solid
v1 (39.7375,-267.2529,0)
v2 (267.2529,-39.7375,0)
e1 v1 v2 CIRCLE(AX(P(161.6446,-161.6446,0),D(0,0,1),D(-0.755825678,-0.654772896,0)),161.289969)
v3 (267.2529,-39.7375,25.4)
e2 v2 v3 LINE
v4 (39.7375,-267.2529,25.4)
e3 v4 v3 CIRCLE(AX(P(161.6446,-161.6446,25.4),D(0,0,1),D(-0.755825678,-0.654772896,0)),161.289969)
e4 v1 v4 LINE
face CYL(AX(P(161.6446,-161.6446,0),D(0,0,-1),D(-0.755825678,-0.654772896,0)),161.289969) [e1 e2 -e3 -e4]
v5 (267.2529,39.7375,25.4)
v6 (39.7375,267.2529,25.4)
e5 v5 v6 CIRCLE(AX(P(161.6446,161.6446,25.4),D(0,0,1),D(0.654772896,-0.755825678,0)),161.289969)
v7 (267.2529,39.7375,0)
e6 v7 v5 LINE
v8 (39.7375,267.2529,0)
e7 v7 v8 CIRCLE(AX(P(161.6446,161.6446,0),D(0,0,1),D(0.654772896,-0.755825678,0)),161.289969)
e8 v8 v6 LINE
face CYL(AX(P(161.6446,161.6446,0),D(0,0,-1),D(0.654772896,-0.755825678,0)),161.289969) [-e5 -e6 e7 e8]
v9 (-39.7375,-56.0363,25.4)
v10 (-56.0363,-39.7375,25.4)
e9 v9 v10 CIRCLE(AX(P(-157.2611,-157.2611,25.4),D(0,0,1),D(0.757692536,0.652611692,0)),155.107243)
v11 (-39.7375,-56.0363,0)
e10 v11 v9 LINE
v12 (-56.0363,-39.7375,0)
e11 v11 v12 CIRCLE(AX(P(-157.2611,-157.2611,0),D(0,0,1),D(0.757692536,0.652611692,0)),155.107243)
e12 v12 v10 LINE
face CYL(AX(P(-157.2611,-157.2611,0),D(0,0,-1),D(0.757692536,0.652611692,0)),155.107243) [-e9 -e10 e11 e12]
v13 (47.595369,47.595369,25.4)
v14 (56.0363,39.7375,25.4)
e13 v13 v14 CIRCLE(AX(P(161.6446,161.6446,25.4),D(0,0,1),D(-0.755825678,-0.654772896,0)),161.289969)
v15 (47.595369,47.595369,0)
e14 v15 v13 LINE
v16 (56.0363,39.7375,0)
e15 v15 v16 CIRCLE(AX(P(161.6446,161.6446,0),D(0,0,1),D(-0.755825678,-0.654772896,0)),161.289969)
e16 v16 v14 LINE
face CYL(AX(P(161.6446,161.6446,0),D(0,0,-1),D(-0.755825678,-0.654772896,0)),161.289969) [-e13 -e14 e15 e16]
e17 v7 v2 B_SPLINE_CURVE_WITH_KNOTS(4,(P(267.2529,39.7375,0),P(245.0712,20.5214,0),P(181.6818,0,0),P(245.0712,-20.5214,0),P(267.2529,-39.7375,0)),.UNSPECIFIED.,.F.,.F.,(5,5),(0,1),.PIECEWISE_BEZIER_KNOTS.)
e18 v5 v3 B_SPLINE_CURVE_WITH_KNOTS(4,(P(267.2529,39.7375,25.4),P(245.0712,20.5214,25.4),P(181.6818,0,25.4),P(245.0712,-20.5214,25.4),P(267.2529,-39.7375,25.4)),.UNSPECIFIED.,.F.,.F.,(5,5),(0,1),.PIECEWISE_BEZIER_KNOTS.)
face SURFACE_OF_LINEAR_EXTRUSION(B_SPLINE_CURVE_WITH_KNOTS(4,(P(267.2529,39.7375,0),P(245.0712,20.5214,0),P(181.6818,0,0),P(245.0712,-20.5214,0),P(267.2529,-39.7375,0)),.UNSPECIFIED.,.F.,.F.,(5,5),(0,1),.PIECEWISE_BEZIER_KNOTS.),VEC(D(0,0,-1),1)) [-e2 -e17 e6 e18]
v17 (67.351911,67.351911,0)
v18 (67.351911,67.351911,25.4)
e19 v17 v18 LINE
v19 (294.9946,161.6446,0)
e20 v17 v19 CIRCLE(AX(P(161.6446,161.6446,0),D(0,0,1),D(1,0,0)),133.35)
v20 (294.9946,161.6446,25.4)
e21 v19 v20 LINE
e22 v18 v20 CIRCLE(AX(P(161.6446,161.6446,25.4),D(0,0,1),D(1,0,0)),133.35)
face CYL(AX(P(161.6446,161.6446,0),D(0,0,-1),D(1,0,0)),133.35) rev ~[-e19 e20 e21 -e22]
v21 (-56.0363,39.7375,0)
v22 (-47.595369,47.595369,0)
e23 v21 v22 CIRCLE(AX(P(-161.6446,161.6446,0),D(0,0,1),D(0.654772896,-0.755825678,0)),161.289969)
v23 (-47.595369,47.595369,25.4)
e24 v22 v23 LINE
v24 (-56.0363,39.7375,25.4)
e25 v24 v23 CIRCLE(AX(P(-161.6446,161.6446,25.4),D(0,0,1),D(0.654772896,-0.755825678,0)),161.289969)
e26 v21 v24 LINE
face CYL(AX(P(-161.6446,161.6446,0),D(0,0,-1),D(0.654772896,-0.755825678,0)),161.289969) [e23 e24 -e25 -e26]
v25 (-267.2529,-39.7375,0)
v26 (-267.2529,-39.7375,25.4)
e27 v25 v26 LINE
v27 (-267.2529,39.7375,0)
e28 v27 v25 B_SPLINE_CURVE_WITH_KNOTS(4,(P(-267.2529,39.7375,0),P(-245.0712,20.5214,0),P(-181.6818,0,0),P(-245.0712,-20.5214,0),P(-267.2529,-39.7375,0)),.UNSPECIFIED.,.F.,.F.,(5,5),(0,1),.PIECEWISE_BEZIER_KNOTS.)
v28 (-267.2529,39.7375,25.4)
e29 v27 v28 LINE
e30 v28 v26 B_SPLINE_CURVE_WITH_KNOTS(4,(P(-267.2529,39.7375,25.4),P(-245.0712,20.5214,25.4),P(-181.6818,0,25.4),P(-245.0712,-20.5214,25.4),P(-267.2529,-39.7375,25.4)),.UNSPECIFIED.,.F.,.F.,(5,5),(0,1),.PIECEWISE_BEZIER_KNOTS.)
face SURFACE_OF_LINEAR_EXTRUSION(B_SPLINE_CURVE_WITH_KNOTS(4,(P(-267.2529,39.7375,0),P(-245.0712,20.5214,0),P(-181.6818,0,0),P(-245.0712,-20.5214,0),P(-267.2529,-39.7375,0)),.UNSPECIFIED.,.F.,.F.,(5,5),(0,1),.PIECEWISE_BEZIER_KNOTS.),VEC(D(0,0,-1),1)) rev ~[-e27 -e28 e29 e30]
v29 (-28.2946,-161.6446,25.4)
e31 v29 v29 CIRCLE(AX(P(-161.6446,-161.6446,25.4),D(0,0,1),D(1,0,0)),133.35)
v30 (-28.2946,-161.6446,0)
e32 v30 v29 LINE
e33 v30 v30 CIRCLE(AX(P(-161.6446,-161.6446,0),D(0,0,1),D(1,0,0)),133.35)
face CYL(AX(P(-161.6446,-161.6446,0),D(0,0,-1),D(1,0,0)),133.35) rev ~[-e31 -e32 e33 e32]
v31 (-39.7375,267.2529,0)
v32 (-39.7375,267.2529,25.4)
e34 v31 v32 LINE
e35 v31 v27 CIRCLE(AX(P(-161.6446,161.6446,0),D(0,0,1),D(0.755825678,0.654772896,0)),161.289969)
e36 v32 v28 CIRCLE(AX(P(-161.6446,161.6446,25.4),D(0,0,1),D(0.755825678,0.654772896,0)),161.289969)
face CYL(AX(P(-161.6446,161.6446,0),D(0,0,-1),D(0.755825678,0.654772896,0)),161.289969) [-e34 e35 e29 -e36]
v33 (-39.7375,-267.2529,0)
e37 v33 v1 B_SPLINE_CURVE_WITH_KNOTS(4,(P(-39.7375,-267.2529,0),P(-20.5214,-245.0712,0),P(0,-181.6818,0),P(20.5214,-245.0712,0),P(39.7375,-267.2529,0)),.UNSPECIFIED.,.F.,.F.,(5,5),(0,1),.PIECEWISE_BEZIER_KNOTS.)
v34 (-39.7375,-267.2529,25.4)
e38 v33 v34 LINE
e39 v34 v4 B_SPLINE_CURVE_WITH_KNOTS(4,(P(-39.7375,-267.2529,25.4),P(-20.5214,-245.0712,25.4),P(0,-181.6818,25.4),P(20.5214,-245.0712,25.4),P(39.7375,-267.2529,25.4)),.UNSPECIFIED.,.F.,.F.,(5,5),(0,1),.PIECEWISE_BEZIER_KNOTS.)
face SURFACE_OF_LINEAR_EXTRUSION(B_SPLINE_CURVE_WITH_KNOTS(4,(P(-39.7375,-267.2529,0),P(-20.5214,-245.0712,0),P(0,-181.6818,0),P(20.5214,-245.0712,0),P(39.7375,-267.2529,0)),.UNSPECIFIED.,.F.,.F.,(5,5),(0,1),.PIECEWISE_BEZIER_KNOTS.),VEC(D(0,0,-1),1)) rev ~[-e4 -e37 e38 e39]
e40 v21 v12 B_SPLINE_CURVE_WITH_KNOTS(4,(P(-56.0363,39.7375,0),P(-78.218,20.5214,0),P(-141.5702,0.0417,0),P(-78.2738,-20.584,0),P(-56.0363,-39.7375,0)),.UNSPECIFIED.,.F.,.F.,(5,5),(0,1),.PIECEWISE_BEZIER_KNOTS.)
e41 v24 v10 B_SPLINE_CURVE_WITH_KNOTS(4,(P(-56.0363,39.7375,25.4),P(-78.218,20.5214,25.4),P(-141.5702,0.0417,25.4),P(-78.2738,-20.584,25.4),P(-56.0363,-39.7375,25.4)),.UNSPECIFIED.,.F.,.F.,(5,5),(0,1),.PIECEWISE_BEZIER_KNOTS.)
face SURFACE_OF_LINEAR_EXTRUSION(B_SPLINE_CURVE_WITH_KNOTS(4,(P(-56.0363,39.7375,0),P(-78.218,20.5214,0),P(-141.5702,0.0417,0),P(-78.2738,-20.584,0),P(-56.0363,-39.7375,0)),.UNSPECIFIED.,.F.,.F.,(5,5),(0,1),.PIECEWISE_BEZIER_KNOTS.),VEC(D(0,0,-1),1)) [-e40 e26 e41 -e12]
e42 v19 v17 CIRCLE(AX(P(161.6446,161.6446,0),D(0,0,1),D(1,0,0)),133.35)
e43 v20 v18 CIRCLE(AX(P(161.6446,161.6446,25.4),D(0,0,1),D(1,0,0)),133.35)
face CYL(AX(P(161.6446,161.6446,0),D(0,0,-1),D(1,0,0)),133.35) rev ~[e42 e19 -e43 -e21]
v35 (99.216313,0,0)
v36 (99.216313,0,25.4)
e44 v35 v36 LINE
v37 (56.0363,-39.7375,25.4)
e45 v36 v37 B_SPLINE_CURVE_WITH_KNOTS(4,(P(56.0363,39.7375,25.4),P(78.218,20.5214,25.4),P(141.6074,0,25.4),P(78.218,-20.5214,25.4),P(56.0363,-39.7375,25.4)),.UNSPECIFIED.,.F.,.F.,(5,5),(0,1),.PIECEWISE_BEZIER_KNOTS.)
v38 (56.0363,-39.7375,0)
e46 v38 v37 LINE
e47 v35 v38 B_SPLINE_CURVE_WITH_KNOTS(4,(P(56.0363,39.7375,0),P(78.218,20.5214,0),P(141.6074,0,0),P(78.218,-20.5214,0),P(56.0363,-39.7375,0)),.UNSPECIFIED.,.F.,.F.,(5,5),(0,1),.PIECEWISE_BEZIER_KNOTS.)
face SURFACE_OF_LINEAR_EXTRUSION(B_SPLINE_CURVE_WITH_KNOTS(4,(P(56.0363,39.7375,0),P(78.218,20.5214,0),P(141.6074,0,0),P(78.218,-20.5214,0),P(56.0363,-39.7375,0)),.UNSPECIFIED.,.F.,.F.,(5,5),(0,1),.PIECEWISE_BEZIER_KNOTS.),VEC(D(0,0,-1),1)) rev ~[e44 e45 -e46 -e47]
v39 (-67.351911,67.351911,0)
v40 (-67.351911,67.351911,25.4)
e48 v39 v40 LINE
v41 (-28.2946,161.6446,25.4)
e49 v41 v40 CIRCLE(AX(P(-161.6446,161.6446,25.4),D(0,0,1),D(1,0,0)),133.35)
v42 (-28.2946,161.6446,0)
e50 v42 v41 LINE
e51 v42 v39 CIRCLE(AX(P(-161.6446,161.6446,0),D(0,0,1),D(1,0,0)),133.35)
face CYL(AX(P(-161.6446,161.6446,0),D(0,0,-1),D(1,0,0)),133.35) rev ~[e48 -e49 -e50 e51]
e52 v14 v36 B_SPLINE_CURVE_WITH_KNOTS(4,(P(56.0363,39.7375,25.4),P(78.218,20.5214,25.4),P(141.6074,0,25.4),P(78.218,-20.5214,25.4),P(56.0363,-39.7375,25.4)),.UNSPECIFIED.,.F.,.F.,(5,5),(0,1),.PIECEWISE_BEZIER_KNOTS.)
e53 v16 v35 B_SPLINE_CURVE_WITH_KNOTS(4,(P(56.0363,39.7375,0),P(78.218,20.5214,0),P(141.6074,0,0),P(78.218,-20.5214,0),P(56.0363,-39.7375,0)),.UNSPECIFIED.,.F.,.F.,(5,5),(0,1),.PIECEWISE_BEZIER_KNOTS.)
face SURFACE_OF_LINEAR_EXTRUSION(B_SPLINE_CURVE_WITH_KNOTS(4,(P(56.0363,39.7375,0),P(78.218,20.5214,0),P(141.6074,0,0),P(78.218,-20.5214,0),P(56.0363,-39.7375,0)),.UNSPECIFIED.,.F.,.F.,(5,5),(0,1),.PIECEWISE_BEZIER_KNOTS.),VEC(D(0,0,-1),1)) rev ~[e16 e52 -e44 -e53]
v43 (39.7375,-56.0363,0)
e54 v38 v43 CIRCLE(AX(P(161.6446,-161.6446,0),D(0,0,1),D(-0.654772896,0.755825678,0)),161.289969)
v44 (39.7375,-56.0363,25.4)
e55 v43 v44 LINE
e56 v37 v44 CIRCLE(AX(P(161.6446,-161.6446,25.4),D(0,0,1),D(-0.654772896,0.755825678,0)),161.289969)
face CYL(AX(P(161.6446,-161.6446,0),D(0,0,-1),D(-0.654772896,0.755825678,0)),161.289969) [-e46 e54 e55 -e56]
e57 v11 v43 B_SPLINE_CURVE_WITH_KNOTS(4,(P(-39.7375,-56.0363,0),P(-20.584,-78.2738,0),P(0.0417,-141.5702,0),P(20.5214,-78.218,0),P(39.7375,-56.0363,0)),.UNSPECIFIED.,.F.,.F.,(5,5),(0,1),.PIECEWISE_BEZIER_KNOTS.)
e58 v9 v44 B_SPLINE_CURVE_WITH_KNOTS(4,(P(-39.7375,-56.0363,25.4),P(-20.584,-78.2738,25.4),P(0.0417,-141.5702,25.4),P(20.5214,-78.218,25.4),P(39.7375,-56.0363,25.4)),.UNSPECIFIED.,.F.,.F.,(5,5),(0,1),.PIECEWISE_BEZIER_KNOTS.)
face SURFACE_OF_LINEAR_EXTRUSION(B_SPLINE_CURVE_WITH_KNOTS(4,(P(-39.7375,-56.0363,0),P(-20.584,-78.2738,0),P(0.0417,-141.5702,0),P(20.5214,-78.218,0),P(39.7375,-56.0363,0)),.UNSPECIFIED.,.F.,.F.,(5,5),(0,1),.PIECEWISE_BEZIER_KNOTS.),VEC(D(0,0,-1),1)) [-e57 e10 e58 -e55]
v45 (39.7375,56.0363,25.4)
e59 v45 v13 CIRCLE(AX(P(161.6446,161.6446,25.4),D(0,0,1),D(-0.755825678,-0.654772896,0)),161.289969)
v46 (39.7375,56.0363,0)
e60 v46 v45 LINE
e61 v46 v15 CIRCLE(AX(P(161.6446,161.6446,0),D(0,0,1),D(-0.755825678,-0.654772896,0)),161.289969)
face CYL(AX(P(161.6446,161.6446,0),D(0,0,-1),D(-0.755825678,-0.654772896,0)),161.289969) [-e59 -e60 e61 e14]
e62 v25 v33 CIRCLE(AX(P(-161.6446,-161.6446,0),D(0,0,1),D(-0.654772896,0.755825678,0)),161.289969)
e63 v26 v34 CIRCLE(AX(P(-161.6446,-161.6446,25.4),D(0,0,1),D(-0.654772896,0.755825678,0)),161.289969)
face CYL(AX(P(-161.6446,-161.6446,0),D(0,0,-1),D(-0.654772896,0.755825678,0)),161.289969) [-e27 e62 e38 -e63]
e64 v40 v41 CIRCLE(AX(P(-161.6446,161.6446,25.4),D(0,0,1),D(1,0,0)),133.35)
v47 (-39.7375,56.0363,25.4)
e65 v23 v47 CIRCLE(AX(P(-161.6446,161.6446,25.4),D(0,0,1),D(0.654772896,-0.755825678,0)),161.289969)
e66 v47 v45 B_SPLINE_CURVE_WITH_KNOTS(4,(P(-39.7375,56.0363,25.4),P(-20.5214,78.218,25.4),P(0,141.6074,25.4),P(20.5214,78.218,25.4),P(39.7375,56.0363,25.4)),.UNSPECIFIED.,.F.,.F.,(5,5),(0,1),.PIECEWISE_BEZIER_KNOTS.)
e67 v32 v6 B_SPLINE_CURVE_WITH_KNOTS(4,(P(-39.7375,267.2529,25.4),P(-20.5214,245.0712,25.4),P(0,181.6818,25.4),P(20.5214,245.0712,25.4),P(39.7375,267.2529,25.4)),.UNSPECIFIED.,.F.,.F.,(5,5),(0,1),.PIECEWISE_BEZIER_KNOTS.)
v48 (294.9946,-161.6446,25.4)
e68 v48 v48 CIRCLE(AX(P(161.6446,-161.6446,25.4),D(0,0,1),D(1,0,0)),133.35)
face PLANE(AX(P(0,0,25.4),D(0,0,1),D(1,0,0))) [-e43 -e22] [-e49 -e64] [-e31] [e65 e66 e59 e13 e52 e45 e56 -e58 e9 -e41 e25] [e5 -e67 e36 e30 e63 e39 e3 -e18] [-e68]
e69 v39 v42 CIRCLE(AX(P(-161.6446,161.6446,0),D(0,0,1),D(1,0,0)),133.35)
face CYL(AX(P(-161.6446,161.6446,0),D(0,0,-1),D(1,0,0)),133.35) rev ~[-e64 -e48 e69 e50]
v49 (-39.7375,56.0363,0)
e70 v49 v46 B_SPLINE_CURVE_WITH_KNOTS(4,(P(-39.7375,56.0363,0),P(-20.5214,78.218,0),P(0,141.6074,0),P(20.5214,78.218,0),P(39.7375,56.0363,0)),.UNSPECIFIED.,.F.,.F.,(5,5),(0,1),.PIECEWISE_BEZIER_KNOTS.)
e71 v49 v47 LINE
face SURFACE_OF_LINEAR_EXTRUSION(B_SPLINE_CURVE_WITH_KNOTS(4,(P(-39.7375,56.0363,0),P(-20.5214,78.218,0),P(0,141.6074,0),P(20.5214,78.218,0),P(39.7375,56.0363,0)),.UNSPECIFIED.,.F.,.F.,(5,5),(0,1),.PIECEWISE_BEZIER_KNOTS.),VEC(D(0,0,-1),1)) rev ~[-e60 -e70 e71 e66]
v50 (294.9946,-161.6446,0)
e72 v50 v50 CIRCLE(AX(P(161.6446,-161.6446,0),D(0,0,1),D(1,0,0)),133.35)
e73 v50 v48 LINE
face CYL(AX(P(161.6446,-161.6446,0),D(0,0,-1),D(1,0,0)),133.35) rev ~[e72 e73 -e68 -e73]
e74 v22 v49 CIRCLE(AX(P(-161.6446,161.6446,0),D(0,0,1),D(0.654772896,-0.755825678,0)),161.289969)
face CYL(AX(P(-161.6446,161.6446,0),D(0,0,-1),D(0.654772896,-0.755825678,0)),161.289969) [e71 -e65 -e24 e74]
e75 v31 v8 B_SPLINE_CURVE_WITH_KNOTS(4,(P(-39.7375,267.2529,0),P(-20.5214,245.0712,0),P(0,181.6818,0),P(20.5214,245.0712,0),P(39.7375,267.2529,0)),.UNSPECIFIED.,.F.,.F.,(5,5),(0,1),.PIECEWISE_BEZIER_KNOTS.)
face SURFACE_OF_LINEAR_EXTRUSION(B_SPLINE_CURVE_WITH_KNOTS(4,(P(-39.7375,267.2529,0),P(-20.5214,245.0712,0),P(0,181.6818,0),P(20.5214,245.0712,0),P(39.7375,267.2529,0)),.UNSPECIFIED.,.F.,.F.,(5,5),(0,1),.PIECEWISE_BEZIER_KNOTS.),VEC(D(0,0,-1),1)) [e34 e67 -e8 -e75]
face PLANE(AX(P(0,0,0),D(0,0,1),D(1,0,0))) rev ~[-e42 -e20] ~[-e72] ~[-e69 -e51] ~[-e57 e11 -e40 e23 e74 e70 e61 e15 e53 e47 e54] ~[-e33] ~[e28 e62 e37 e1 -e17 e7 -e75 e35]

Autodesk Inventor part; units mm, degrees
ref_plane "YZ Plane" through (0, 0, 0) normal (1, 0, 0) x (0, 1, 0)
ref_plane "XZ Plane" through (0, 0, 0) normal (0, 1, 0) x (-1, 0, 0)
ref_plane "XY Plane" through (0, 0, 0) normal (0, 0, 1) x (1, 0, 0)
sketch "Sketch1" plane through (0, 0, 0) normal (0, 0, 1) x (1, 0, 0)
  line L0 (0, 0) -> (71.842, 71.842)
  line L1 (0, 0) -> (101.6, 0) construction
  line L2 (0, 0) -> (-71.842, 71.842)
  line L3 (0, 0) -> (101.6, 0) construction
  circle A0 centre (-161.6446, 161.6446) radius 133.35
  line L4 (0, 0) -> (101.6, 0)
  arc A1 (-39.7375, 267.2529) -> (-267.2529, 39.7375) centre (-161.6446, 161.6446) ccw
  circle A2 centre (161.6446, -161.6446) radius 133.35
  arc A3 (39.7375, -267.2529) -> (267.2529, -39.7375) centre (161.6446, -161.6446) ccw
  circle A4 centre (-161.6446, -161.6446) radius 133.35
  arc A5 (-267.2529, -39.7375) -> (-39.7375, -267.2529) centre (-161.6446, -161.6446) ccw
  arc A6 (267.2529, 39.7375) -> (39.7375, 267.2529) centre (161.6446, 161.6446) ccw
  circle A7 centre (161.6446, 161.6446) radius 133.35
  spline S0 degree 4 poles (-39.7375, 267.2529) (-20.5214, 245.0712) (0, 181.6818) (20.5214, 245.0712) (39.7375, 267.2529) knots 0 0 0 0 0 1 1 1 1 1
  spline S1 degree 4 poles (-39.7375, -267.2529) (-20.5214, -245.0712) (0, -181.6818) (20.5214, -245.0712) (39.7375, -267.2529) knots 0 0 0 0 0 1 1 1 1 1
  spline S2 degree 4 poles (-267.2529, 39.7375) (-245.0712, 20.5214) (-181.6818, 0) (-245.0712, -20.5214) (-267.2529, -39.7375) knots 0 0 0 0 0 1 1 1 1 1
  spline S3 degree 4 poles (267.2529, 39.7375) (245.0712, 20.5214) (181.6818, 0) (245.0712, -20.5214) (267.2529, -39.7375) knots 0 0 0 0 0 1 1 1 1 1
  line L5 (-161.6446, 161.6446) -> (-161.6446, 89.6025)
  line L6 (-161.6446, 161.6446) -> (-76.5569, 161.6446)
  line L7 (161.6446, -161.6446) -> (161.6446, -113.6338)
  line L8 (161.6446, -161.6446) -> (107.4543, -161.6446)
  arc A8 (56.0363, -39.7375) -> (39.7375, -56.0363) centre (161.6446, -161.6446) ccw
  arc A9 (39.7375, 56.0363) -> (56.0363, 39.7375) centre (161.6446, 161.6446) ccw
  arc A10 (-56.0363, 39.7375) -> (-39.7375, 56.0363) centre (-161.6446, 161.6446) ccw
  arc A11 (-39.7375, -56.0363) -> (-56.0363, -39.7375) centre (-157.2611, -157.2611) ccw
  spline S4 degree 4 poles (-56.0363, 39.7375) (-78.218, 20.5214) (-141.5702, 0.0417) (-78.2738, -20.584) (-56.0363, -39.7375) knots 0 0 0 0 0 1 1 1 1 1
  spline S5 degree 4 poles (-39.7375, -56.0363) (-20.584, -78.2738) (0.0417, -141.5702) (20.5214, -78.218) (39.7375, -56.0363) knots 0 0 0 0 0 1 1 1 1 1
  spline S6 degree 4 poles (-39.7375, 56.0363) (-20.5214, 78.218) (0, 141.6074) (20.5214, 78.218) (39.7375, 56.0363) knots 0 0 0 0 0 1 1 1 1 1
  spline S7 degree 4 poles (56.0363, 39.7375) (78.218, 20.5214) (141.6074, 0) (78.218, -20.5214) (56.0363, -39.7375) knots 0 0 0 0 0 1 1 1 1 1
  point P0 (0, 224.0729)
  point P1 (0, -224.0729)
  point P2 (-224.0729, 0)
  point P3 (224.0729, 0)
  point P4 (-99.2163, 0)
  point P5 (0, -99.2163)
  point P6 (0, 99.2163)
  point P7 (99.2163, 0)
  dimension "d0" = 101.6
  dimension "d1" = 45
  dimension "d2" = 101.6
  dimension "d3" = 135
  dimension "d5" = 228.6
  dimension "d7" = 266.7
  dimension "d9" = 0
  dimension "d14" = 27.94
  dimension "d15" = 0
  dimension "d17" = 0
  dimension "d26" = 43.18
extrude "Extrusion3" add sketch "Sketch1" along normal blind 25.4
properties part number "PropProtector"
